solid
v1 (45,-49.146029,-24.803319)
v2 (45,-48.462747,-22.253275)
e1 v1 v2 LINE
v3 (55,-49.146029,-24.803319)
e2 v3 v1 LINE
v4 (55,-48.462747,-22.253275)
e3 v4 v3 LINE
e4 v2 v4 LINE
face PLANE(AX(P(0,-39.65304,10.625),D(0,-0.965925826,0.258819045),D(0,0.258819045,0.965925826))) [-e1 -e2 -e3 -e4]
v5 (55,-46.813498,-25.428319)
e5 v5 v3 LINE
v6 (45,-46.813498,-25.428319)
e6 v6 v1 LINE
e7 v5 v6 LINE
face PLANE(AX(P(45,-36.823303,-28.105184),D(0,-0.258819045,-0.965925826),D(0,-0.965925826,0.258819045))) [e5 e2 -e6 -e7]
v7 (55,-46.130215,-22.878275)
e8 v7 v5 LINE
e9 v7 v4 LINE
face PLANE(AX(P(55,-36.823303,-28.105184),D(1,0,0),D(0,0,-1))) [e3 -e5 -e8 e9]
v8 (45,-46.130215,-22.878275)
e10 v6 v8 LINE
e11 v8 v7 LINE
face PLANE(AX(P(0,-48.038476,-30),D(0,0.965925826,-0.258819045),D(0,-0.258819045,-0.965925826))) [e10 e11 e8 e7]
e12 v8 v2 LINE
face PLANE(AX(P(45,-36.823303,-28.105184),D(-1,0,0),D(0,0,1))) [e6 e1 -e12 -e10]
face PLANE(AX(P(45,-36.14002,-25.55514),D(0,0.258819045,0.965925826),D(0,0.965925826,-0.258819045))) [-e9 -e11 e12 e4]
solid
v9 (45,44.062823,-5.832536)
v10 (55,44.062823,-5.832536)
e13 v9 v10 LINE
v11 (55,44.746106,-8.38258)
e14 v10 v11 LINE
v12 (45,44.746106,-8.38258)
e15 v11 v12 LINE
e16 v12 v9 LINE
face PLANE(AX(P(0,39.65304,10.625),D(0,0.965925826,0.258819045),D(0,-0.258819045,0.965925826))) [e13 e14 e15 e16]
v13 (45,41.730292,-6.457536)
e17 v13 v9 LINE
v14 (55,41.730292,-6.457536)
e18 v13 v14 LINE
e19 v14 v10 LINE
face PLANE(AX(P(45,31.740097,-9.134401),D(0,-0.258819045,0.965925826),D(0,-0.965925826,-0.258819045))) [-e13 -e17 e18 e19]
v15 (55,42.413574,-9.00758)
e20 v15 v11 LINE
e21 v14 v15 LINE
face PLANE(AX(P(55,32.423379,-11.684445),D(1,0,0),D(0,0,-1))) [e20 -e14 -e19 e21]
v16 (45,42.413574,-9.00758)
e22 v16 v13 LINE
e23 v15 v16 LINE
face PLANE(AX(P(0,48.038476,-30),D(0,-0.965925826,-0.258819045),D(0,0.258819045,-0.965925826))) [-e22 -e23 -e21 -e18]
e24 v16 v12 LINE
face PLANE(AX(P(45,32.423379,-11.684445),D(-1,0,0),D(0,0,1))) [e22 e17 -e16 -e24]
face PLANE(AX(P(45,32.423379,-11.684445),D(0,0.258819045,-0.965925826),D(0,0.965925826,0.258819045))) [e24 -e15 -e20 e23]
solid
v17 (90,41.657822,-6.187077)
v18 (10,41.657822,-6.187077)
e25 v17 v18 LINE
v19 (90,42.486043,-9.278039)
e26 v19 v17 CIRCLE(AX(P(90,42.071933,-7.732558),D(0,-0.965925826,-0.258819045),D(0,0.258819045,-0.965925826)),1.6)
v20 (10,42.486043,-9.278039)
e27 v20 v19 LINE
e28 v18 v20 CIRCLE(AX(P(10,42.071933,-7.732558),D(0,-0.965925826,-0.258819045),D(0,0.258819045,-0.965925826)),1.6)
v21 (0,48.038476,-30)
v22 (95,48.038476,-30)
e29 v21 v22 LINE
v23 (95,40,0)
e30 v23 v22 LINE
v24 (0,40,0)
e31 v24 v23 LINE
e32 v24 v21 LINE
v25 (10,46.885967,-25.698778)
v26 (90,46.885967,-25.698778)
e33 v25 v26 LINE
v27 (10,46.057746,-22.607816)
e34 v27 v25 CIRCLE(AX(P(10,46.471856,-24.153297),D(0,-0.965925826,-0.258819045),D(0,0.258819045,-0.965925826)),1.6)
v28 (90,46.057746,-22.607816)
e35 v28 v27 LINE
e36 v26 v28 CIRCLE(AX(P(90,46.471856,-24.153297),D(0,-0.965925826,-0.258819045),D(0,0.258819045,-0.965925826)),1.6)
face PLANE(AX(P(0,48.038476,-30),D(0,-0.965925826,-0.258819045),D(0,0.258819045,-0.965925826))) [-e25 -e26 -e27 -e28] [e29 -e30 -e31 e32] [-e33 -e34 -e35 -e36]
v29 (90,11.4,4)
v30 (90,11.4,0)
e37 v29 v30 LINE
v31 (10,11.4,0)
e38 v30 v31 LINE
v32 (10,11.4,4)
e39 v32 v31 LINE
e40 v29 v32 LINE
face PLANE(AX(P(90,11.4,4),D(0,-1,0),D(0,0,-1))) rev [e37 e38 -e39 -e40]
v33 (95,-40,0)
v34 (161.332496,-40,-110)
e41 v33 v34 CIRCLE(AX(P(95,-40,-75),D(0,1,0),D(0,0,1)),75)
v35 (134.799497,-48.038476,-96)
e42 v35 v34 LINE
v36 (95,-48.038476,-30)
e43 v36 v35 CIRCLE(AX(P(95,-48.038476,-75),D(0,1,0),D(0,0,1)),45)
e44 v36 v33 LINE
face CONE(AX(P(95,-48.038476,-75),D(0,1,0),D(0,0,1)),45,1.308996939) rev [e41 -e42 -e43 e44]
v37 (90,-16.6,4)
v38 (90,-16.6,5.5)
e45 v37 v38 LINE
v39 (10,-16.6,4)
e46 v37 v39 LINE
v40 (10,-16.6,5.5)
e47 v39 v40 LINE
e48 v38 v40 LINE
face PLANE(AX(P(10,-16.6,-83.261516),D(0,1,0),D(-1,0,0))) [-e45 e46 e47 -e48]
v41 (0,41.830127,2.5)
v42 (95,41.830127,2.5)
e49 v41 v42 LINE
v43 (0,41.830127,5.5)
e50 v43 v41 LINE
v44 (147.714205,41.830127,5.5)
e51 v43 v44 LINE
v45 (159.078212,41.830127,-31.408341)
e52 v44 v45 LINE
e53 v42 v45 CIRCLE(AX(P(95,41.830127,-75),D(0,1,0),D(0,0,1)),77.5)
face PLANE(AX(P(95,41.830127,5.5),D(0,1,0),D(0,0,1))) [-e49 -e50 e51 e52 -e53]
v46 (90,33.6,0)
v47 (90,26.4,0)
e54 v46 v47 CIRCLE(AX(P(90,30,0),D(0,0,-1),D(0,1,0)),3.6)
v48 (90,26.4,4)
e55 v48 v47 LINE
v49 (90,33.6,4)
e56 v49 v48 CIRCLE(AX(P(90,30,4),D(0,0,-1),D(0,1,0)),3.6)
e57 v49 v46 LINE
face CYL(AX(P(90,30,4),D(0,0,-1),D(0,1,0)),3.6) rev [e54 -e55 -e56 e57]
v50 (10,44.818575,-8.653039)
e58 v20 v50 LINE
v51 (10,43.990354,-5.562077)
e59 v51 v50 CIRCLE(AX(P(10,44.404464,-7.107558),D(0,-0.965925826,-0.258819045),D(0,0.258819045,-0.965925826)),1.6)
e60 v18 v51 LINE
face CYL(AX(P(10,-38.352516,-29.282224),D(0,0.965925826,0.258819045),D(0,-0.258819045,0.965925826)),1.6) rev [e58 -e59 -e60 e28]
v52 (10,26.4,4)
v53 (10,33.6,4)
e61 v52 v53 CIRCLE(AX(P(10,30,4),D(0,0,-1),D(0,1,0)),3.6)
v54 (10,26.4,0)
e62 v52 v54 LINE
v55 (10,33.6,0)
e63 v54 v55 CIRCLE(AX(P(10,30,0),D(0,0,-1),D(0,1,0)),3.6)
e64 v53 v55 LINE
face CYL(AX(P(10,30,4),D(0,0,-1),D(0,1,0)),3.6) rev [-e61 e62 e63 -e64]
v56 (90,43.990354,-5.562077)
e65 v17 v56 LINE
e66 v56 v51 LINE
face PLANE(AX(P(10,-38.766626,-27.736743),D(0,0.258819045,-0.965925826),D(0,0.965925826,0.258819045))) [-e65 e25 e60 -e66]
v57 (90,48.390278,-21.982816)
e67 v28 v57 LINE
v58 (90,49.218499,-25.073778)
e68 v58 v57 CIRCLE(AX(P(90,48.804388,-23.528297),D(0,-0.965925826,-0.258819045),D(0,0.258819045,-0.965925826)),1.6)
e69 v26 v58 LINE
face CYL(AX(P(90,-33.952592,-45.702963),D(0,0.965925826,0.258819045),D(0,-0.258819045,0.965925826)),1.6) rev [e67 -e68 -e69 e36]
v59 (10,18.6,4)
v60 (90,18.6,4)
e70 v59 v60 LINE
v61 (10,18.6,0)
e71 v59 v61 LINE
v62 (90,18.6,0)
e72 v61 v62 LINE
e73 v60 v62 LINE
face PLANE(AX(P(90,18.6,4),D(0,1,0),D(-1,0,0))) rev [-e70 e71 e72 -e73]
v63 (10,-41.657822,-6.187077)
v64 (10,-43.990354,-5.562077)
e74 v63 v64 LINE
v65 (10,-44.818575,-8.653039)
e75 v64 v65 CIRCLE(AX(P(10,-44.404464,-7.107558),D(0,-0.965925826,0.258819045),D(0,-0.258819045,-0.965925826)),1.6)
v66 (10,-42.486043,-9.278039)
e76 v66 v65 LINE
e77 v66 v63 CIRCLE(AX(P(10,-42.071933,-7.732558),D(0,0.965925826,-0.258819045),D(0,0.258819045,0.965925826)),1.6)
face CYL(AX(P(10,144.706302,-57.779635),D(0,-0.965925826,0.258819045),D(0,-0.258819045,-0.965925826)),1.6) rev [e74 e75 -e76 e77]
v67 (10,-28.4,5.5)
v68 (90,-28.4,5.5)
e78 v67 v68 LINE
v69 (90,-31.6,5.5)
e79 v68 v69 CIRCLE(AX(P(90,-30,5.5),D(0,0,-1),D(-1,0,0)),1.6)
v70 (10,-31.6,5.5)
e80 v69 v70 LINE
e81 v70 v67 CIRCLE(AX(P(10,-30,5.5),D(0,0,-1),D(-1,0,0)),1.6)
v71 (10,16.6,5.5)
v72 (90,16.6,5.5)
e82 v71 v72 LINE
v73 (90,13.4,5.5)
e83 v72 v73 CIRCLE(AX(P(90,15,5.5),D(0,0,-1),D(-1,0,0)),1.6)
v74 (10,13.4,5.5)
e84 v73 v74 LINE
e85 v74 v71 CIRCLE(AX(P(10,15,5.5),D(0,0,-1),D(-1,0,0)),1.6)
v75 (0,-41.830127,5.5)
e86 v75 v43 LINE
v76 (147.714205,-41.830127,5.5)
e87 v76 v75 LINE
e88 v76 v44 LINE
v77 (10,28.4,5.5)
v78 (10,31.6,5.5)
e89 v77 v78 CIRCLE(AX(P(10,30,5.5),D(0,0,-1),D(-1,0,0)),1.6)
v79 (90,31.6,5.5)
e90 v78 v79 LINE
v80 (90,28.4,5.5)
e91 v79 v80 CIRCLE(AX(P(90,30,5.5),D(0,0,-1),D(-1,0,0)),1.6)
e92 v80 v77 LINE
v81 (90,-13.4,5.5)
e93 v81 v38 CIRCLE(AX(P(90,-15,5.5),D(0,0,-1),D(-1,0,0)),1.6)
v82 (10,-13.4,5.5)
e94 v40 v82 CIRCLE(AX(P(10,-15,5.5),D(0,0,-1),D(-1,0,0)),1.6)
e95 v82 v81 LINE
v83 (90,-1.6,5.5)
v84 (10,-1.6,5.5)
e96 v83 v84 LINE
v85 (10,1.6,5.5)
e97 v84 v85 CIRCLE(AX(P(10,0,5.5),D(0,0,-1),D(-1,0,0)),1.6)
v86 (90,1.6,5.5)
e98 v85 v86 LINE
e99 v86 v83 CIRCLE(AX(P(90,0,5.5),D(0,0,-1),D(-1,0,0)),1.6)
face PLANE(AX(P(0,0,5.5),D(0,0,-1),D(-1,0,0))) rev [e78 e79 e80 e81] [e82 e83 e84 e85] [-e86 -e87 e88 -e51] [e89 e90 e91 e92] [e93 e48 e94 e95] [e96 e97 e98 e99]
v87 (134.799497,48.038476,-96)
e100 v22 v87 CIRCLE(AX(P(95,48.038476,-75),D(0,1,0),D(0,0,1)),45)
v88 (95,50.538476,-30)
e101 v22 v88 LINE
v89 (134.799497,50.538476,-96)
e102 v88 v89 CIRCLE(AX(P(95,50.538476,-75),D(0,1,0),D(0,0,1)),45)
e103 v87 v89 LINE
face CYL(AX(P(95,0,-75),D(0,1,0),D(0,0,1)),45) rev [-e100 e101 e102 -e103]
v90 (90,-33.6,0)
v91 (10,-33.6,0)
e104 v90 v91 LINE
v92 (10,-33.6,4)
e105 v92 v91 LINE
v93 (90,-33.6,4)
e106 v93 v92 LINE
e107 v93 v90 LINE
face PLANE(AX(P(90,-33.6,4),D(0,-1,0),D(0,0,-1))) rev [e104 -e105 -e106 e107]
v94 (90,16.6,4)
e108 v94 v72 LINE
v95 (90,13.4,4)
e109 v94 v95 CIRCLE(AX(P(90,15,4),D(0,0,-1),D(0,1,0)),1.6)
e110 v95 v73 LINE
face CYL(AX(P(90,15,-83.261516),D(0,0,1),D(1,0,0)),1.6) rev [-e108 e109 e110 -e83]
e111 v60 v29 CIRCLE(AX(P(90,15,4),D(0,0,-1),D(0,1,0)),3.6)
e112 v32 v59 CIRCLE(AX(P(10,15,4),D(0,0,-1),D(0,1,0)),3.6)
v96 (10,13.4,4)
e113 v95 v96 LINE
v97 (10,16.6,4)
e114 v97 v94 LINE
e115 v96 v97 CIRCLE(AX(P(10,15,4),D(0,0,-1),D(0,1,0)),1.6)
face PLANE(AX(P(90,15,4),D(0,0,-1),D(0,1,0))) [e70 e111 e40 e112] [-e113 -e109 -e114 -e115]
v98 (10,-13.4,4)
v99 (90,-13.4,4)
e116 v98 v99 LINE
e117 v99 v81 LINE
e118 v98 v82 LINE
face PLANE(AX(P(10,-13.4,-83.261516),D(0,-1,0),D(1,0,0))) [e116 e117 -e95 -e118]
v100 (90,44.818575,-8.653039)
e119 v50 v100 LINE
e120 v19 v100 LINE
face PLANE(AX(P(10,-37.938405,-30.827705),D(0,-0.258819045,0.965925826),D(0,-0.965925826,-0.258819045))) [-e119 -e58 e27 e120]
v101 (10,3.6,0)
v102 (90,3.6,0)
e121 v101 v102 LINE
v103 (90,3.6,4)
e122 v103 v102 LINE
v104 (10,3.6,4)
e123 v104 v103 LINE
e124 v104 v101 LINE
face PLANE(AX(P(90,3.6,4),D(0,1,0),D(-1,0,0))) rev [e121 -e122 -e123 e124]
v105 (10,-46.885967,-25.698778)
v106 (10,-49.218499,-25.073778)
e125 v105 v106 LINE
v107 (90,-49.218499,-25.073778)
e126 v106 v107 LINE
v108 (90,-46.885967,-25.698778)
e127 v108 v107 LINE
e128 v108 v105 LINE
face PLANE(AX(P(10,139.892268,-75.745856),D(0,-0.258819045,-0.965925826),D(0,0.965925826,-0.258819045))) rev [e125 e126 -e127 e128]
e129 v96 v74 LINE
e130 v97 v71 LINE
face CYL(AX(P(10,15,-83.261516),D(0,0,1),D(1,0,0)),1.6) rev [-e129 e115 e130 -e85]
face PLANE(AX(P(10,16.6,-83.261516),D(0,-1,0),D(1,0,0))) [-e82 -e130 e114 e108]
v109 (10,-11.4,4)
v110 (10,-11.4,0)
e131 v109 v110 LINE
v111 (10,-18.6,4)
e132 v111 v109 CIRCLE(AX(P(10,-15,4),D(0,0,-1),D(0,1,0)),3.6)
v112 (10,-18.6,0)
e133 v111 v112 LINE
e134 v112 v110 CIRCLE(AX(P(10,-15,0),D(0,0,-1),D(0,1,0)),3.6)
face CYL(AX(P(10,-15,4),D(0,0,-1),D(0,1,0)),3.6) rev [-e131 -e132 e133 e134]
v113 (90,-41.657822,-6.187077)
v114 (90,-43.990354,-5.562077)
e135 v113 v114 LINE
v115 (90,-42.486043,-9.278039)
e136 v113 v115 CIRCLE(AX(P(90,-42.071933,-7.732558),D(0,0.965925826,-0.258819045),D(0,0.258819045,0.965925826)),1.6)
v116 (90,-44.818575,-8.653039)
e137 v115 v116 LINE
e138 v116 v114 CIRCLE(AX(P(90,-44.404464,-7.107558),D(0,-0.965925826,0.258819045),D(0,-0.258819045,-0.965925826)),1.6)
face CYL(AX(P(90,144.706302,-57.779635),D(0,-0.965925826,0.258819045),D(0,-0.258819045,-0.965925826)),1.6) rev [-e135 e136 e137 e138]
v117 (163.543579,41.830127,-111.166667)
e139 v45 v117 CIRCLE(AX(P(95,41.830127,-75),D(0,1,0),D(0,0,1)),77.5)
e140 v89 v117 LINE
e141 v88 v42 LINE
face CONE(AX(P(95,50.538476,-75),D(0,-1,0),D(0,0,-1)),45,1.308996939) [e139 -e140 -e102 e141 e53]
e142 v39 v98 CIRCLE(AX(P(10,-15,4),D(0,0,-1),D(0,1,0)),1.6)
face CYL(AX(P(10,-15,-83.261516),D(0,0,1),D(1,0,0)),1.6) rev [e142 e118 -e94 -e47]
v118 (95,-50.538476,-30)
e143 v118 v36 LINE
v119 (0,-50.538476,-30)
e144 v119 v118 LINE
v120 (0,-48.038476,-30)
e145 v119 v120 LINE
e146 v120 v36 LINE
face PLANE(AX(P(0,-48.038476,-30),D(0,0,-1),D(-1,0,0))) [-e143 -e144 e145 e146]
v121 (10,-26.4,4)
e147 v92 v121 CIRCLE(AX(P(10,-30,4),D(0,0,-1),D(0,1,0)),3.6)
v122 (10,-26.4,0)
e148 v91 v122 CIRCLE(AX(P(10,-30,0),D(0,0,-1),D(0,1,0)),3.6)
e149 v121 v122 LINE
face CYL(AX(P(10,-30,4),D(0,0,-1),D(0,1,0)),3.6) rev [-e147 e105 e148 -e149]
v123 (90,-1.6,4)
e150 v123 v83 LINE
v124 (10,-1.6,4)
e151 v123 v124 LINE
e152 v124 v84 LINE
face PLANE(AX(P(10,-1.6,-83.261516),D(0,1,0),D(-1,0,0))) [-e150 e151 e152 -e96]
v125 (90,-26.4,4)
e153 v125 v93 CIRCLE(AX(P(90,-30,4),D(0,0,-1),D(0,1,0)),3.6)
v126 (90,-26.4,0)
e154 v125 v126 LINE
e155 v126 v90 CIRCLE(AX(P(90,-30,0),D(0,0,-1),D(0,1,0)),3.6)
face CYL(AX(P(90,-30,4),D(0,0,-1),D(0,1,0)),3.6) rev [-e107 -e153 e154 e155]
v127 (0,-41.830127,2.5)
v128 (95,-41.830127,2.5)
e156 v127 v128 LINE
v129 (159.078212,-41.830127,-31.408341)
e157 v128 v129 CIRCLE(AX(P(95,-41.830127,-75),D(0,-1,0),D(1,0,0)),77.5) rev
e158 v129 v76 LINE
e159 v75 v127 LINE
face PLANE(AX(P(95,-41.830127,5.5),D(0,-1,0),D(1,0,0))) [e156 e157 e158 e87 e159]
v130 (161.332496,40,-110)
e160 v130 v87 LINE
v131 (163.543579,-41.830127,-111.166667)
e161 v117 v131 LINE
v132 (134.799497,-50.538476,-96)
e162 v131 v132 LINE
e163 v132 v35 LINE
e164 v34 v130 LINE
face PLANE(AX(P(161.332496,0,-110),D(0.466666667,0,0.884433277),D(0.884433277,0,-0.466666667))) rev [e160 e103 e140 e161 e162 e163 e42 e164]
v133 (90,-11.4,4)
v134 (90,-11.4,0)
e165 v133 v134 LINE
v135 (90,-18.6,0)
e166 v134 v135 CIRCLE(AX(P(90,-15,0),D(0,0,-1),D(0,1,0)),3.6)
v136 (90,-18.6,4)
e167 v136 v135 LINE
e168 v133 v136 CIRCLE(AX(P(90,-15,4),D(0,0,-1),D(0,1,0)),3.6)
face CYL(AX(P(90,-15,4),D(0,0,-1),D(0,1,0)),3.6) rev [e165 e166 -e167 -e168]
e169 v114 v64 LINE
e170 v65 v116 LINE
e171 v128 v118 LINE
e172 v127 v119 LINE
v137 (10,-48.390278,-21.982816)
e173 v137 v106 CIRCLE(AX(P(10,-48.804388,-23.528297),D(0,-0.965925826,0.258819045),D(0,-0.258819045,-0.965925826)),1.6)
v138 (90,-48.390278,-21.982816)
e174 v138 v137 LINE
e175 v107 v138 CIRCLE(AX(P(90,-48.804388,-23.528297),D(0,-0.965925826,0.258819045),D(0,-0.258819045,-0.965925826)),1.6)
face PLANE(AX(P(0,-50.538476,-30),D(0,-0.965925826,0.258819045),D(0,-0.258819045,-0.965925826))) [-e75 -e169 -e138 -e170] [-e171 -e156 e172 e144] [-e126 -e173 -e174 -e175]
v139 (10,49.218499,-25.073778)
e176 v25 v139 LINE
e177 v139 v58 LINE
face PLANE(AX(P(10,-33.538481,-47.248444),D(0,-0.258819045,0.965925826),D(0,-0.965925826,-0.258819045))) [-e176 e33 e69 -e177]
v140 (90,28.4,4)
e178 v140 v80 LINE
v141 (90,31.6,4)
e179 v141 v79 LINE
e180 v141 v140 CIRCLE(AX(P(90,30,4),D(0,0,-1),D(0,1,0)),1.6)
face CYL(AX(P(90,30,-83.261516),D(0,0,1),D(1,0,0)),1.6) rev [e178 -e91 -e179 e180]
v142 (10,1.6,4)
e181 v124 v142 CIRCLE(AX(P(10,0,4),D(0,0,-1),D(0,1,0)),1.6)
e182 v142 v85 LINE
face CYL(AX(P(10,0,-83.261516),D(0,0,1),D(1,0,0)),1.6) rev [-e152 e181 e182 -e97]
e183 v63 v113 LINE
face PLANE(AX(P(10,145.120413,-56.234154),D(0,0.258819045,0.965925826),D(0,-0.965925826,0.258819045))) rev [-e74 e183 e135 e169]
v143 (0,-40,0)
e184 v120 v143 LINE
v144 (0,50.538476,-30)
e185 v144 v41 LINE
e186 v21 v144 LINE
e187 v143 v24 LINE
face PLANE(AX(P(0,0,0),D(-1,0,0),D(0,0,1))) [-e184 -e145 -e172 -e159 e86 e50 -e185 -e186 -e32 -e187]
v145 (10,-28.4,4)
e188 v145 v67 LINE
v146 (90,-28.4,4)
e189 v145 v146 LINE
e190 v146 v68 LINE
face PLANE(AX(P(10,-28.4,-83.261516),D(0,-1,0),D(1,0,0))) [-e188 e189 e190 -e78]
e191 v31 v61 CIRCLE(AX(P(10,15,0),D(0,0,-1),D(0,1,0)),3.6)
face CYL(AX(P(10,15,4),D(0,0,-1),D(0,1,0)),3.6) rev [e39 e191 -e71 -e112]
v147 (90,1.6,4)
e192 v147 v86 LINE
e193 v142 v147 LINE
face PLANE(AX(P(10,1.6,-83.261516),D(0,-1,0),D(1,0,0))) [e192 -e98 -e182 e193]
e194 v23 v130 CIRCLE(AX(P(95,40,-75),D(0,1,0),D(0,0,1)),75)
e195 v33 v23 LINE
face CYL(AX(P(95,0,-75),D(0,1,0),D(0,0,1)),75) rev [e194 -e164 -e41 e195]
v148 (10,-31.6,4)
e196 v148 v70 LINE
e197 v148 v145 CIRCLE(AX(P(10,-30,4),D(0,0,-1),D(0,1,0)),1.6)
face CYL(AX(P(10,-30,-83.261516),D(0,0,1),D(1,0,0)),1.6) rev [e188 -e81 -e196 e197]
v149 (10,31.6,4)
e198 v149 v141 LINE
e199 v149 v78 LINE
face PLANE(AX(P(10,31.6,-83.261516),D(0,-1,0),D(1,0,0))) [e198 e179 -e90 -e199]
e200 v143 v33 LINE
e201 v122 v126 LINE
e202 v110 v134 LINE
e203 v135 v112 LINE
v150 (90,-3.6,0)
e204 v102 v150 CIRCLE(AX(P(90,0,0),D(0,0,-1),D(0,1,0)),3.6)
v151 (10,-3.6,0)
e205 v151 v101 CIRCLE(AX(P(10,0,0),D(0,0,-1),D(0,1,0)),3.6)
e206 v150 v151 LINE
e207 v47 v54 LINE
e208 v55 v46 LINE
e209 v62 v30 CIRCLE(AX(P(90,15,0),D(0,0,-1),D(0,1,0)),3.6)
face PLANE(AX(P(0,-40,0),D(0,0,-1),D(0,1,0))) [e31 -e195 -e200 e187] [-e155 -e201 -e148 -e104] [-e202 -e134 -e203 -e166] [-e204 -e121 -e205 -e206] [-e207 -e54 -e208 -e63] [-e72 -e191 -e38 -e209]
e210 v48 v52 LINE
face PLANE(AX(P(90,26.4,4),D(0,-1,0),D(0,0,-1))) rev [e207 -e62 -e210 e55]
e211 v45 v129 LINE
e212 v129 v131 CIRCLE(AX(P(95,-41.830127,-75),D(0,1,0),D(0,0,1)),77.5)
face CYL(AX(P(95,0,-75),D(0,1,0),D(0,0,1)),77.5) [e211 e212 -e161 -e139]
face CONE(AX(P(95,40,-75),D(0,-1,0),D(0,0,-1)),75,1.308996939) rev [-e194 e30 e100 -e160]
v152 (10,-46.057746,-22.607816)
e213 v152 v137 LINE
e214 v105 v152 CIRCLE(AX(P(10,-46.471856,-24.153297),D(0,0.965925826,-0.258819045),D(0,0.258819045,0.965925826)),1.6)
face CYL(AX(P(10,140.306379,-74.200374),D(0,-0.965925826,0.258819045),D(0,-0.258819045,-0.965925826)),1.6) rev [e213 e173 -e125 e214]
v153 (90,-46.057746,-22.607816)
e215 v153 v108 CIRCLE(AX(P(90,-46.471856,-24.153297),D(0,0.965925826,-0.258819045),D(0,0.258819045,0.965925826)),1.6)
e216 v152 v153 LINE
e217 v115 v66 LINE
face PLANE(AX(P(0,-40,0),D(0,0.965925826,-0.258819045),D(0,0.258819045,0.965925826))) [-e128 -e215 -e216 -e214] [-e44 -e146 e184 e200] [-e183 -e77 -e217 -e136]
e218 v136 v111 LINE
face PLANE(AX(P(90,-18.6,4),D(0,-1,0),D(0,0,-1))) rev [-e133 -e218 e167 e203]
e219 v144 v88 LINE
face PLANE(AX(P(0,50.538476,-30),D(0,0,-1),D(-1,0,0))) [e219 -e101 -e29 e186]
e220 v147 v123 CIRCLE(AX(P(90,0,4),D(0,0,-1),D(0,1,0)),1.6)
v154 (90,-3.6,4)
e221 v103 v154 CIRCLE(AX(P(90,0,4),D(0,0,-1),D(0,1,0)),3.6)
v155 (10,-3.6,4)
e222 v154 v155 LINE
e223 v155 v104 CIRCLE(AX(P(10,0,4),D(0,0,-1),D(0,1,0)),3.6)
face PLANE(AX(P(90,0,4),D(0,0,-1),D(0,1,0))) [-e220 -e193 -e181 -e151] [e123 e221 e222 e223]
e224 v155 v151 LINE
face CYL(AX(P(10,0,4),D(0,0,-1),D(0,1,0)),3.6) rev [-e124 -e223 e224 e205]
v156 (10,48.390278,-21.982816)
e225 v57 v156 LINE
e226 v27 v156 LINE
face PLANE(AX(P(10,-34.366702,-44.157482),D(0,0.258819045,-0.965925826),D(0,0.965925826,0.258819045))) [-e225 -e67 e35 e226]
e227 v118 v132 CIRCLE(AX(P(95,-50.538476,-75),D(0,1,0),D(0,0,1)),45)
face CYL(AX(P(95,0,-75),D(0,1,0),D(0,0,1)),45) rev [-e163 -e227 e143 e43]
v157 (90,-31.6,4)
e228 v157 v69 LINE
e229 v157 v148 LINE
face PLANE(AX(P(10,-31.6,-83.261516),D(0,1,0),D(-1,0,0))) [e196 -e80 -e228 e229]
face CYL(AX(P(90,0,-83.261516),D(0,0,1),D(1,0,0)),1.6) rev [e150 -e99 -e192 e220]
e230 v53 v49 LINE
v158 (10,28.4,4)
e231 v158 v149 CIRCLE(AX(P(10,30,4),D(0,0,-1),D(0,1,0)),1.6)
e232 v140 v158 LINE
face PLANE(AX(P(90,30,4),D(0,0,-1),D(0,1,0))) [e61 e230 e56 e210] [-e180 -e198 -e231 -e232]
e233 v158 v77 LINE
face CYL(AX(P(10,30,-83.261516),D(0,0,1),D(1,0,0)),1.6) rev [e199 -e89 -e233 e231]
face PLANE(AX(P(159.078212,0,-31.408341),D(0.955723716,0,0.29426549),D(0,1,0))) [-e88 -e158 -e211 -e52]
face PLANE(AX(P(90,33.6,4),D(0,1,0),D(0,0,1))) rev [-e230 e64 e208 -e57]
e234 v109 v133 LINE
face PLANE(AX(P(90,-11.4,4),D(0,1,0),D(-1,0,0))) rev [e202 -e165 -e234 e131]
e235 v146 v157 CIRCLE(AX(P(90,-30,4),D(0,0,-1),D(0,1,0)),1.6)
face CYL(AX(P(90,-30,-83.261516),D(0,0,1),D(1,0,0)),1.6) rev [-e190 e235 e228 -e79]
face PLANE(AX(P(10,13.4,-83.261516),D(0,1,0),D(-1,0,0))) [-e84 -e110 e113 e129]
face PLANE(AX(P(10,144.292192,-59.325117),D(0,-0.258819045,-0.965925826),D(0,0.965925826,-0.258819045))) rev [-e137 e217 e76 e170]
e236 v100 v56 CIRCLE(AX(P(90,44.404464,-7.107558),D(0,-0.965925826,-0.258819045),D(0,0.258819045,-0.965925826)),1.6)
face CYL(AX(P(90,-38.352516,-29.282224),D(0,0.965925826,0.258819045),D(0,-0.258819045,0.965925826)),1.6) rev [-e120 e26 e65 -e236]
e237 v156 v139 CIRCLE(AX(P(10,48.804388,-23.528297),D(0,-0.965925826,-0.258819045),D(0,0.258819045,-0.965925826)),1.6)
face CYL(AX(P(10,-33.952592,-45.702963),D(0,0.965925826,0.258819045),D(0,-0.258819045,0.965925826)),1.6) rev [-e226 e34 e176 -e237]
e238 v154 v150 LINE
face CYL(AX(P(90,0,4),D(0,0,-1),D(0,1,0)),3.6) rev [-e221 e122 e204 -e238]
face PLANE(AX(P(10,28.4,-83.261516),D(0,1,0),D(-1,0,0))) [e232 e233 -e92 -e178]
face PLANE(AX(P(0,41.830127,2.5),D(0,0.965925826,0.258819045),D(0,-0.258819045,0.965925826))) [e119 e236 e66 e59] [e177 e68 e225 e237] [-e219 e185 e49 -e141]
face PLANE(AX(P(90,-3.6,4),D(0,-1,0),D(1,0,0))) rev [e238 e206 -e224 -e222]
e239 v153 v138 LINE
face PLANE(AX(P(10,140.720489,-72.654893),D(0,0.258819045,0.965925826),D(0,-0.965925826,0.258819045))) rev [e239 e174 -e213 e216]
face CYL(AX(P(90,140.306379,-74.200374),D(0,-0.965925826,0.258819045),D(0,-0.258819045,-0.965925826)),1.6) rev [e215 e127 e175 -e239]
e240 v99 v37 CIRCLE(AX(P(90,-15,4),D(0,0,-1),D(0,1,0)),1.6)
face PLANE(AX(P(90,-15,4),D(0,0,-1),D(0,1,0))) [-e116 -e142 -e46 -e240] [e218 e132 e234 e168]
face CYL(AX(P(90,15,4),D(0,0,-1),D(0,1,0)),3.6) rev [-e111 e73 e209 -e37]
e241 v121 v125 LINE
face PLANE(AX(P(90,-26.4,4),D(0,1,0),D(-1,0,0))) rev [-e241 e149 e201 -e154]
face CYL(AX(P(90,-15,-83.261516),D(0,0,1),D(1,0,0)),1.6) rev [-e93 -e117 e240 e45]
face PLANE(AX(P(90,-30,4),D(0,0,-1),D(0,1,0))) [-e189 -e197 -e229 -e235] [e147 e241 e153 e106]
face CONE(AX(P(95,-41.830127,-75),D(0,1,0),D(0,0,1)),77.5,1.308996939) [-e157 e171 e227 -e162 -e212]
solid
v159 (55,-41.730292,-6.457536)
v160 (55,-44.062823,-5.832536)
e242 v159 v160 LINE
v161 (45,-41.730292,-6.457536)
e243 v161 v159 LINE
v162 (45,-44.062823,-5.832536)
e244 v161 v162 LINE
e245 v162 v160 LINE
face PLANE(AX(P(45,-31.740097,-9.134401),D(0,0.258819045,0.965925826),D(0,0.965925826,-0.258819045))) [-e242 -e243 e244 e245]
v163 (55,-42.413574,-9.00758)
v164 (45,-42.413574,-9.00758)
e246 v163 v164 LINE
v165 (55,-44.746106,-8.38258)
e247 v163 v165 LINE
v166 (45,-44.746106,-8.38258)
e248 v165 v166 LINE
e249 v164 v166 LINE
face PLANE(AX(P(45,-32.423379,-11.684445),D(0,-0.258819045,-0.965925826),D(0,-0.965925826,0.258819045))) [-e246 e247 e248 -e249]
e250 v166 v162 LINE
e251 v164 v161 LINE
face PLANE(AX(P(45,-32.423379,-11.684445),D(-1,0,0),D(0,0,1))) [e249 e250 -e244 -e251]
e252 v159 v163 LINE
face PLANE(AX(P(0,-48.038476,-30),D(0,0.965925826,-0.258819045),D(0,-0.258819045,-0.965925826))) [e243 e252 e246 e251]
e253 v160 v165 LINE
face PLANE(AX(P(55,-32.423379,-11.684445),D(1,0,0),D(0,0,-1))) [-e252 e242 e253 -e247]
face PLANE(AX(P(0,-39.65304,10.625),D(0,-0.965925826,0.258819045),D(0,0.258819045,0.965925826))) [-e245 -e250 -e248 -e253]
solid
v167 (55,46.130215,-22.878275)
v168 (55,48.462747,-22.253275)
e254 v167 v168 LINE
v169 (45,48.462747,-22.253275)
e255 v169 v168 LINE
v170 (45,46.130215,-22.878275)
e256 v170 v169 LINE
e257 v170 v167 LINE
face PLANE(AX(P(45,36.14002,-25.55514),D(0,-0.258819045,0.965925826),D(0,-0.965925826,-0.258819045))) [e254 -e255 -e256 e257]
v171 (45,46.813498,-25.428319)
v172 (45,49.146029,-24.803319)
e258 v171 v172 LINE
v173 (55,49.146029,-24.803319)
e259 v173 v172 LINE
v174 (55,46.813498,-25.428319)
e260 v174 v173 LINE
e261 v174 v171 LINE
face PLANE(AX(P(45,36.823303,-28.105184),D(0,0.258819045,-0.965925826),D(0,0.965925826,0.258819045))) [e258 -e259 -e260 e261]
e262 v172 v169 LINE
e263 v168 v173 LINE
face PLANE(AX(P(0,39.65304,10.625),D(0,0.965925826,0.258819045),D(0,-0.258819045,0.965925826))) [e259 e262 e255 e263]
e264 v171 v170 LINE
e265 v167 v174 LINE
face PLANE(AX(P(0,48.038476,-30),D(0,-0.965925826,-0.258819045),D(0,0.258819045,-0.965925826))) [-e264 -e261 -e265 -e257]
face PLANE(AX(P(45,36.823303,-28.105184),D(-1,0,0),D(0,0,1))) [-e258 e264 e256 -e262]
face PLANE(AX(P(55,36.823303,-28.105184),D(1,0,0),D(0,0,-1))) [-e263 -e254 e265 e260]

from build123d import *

# Parameters (mm, degrees)
CUT_EXTRUDE1_DEPTH    = 2.5
BOSS_EXTRUDE1_START   = -3
SKETCH7_W             = 95
SKETCH7_H             = 83.660254038
BOSS_EXTRUDE1_DEPTH   = 3
CUT_EXTRUDE2_DEPTH    = 4
CUT_EXTRUDE3_DEPTH    = 105.15629562
SKETCH13_W            = 10
SKETCH13_H            = 2.64
BOSS_EXTRUDE2_DEPTH   = 2.414814566
BOSS_EXTRUDE2_2_DEPTH = 2.414814566


with BuildPart() as part:
    # Sweep1: sweep along a path in Sketch2
    with BuildLine(Plane(origin=(0, 0, 0), x_dir=(1, 0, 0), z_dir=(0, 1, 0))) as sweep1_path:
        Line((0, 0), (95, 0))
        ThreePointArc((95, 0), (159.226162893, 36.270166538), (161.332495807, 110))
    # Sketch4 → Sweep1 (sweep)
    with BuildSketch(Plane(origin=(0, 0, 0), x_dir=(0, 0, -1), z_dir=(1, 0, 0))):
        Polygon((0, -40), (0, 40), (30, 48.038475773), (30, 50.538475773), (-2.5, 41.830127019), (-2.5, -41.830127019), (30, -50.538475773), (30, -48.038475773), align=None)
    sweep(path=sweep1_path.line)

    # Sketch6 → Cut-Extrude1 (cut)
    with BuildSketch(Plane(origin=(53, 0, 2.5), x_dir=(-1, 0, 0), z_dir=(0, 0, -1))):
        with BuildLine():
            Line((43, 28.4), (-37, 28.4))
            ThreePointArc((-37, 28.4), (-38.6, 30), (-37, 31.6))
            Line((-37, 31.6), (43, 31.6))
            ThreePointArc((43, 31.6), (44.6, 30), (43, 28.4))
        make_face()
        with BuildLine():
            Line((43, -1.6), (-37, -1.6))
            ThreePointArc((-37, -1.6), (-38.6, 0), (-37, 1.6))
            Line((-37, 1.6), (43, 1.6))
            ThreePointArc((43, 1.6), (44.6, 0), (43, -1.6))
        make_face()
        with BuildLine():
            Line((43, -31.6), (-37, -31.6))
            ThreePointArc((-37, -31.6), (-38.6, -30), (-37, -28.4))
            Line((-37, -28.4), (43, -28.4))
            ThreePointArc((43, -28.4), (44.6, -30), (43, -31.6))
        make_face()
        with BuildLine():
            Line((43, -16.6), (-37, -16.6))
            ThreePointArc((-37, -16.6), (-38.6, -15), (-37, -13.4))
            Line((-37, -13.4), (43, -13.4))
            ThreePointArc((43, -13.4), (44.6, -15), (43, -16.6))
        make_face()
        with BuildLine():
            Line((43, 13.4), (-37, 13.4))
            ThreePointArc((-37, 13.4), (-38.6, 15), (-37, 16.6))
            Line((-37, 16.6), (43, 16.6))
            ThreePointArc((43, 16.6), (44.6, 15), (43, 13.4))
        make_face()
    extrude(amount=CUT_EXTRUDE1_DEPTH, mode=Mode.SUBTRACT)

    # Sketch7 → Boss-Extrude1 (add)
    with BuildSketch(Plane(origin=(50, 0, 2.5), x_dir=(-1, 0, 0), z_dir=(0, 0, -1)).offset(BOSS_EXTRUDE1_START)):
        with Locations((2.5, 0)):
            Rectangle(SKETCH7_W, SKETCH7_H)
        with BuildLine():
            Line((-40, 31.6), (40, 31.6))
            ThreePointArc((40, 31.6), (41.6, 30), (40, 28.4))
            Line((40, 28.4), (-40, 28.4))
            ThreePointArc((-40, 28.4), (-41.6, 30), (-40, 31.6))
        make_face(mode=Mode.SUBTRACT)
        with BuildLine():
            Line((-40, 16.6), (40, 16.6))
            ThreePointArc((40, 16.6), (41.6, 15), (40, 13.4))
            Line((40, 13.4), (-40, 13.4))
            ThreePointArc((-40, 13.4), (-41.6, 15), (-40, 16.6))
        make_face(mode=Mode.SUBTRACT)
        with BuildLine():
            Line((40, -1.6), (-40, -1.6))
            ThreePointArc((-40, -1.6), (-41.6, 0), (-40, 1.6))
            Line((-40, 1.6), (40, 1.6))
            ThreePointArc((40, 1.6), (41.6, 0), (40, -1.6))
        make_face(mode=Mode.SUBTRACT)
        with BuildLine():
            Line((-40, -13.4), (40, -13.4))
            ThreePointArc((40, -13.4), (41.6, -15), (40, -16.6))
            Line((40, -16.6), (-40, -16.6))
            ThreePointArc((-40, -16.6), (-41.6, -15), (-40, -13.4))
        make_face(mode=Mode.SUBTRACT)
        with BuildLine():
            Line((-40, -28.4), (40, -28.4))
            ThreePointArc((40, -28.4), (41.6, -30), (40, -31.6))
            Line((40, -31.6), (-40, -31.6))
            ThreePointArc((-40, -31.6), (-41.6, -30), (-40, -28.4))
        make_face(mode=Mode.SUBTRACT)
    extrude(amount=BOSS_EXTRUDE1_DEPTH)

    # Sketch9 → Cut-Extrude2 (cut)
    with BuildSketch(Plane(origin=(50, 0, 0), x_dir=(-1, 0, 0), z_dir=(0, 0, -1))):
        with BuildLine():
            Line((-40, 33.6), (40, 33.6))
            ThreePointArc((40, 33.6), (43.6, 30), (40, 26.4))
            Line((40, 26.4), (-40, 26.4))
            ThreePointArc((-40, 26.4), (-43.6, 30), (-40, 33.6))
        make_face()
        with BuildLine():
            Line((-40, 18.6), (40, 18.6))
            ThreePointArc((40, 18.6), (43.6, 15), (40, 11.4))
            Line((40, 11.4), (-40, 11.4))
            ThreePointArc((-40, 11.4), (-43.6, 15), (-40, 18.6))
        make_face()
        with BuildLine():
            Line((-40, 3.6), (40, 3.6))
            ThreePointArc((40, 3.6), (43.6, 0), (40, -3.6))
            Line((40, -3.6), (-40, -3.6))
            ThreePointArc((-40, -3.6), (-43.6, 0), (-40, 3.6))
        make_face()
        with BuildLine():
            Line((-40, -11.4), (40, -11.4))
            ThreePointArc((40, -11.4), (43.6, -15), (40, -18.6))
            Line((40, -18.6), (-40, -18.6))
            ThreePointArc((-40, -18.6), (-43.6, -15), (-40, -11.4))
        make_face()
        with BuildLine():
            Line((-40, -26.4), (40, -26.4))
            ThreePointArc((40, -26.4), (43.6, -30), (40, -33.6))
            Line((40, -33.6), (-40, -33.6))
            ThreePointArc((-40, -33.6), (-43.6, -30), (-40, -26.4))
        make_face()
    extrude(amount=-CUT_EXTRUDE2_DEPTH, mode=Mode.SUBTRACT)

    # Sketch10 → Cut-Extrude3 (cut)
    with BuildSketch(Plane(origin=(51.866025404, 52.619546181, -37.766660498), x_dir=(0, -0.2588190451025259, 0.965925826289067), z_dir=(0, -0.965925826289067, -0.2588190451025259))):
        with BuildLine():
            Line((16.340638615, 41.866025404), (16.340638615, -38.133974596))
            ThreePointArc((16.340638615, -38.133974596), (14.740638615, -39.733974596), (13.140638615, -38.133974596))
            Line((13.140638615, -38.133974596), (13.140638615, 41.866025404))
            ThreePointArc((13.140638615, 41.866025404), (14.740638615, 43.466025404), (16.340638615, 41.866025404))
        make_face()
        with BuildLine():
            Line((33.340638615, 41.866025404), (33.340638615, -38.133974596))
            ThreePointArc((33.340638615, -38.133974596), (31.740638615, -39.733974596), (30.140638615, -38.133974596))
            Line((30.140638615, -38.133974596), (30.140638615, 41.866025404))
            ThreePointArc((30.140638615, 41.866025404), (31.740638615, 43.466025404), (33.340638615, 41.866025404))
        make_face()
    cut_extrude3 = extrude(amount=CUT_EXTRUDE3_DEPTH, mode=Mode.SUBTRACT)

    # Chamfer1
    # the kernel refuses this chamfer: 370 mm, written as the material it adds along each edge
    with BuildSketch(Plane(origin=(95, 41.830127019, 2.5), x_dir=(-0.02311618515334583, 0, 0.9997327852901275), z_dir=(0, -1, 0))) as chamfer1_piece_1_section:
        with BuildLine():
            Line((174.160123938, -4.026993743), (-35.380524296, -63.277258154))
            ThreePointArc((-35.380524296, -63.277258154), (-13.18277005, -41.477507792), (0, 0))
            Line((0, 0), (174.160123938, -4.026993743))
        make_face()
    chamfer1_piece_1 = extrude(amount=83.660254038, mode=Mode.PRIVATE)
    chamfer1_piece_1 = split(chamfer1_piece_1, bisect_by=Plane(origin=(121.511498595, 41.56256682, 5.5), z_dir=(0, 0, -1)), keep=Keep.TOP, mode=Mode.PRIVATE)
    add(chamfer1_piece_1)

    # Mirror1: Cut-Extrude3 across plane
    add(cut_extrude3.mirror(Plane.ZX), mode=Mode.SUBTRACT)


with BuildPart() as body_2:
    # Sketch13 → Boss-Extrude2 (new body)
    with BuildSketch(Plane(origin=(0, 39.65303983, 10.625), x_dir=(1, 0, 0), z_dir=(0, 0.965925826289067, 0.2588190451025258))):
        with Locations((50, 18.358094829)):
            Rectangle(SKETCH13_W, SKETCH13_H)
    extrude(amount=-BOSS_EXTRUDE2_DEPTH)


with BuildPart() as body_3:
    # Sketch13 → Boss-Extrude2 2 (new body)
    with BuildSketch(Plane(origin=(0, 39.65303983, 10.625), x_dir=(1, 0, 0), z_dir=(0, 0.965925826289067, 0.2588190451025258))):
        with Locations((50, 35.358094829)):
            Rectangle(SKETCH13_W, SKETCH13_H)
    extrude(amount=-BOSS_EXTRUDE2_2_DEPTH)


with BuildPart() as body_4:
    # Mirror3: mirrored copy
    add(body_3.part.mirror(Plane.ZX))


with BuildPart() as body_5:
    # Mirror3 2: mirrored copy
    add(body_2.part.mirror(Plane.ZX))


solid = Compound([part.part, body_2.part, body_3.part, body_4.part, body_5.part])
